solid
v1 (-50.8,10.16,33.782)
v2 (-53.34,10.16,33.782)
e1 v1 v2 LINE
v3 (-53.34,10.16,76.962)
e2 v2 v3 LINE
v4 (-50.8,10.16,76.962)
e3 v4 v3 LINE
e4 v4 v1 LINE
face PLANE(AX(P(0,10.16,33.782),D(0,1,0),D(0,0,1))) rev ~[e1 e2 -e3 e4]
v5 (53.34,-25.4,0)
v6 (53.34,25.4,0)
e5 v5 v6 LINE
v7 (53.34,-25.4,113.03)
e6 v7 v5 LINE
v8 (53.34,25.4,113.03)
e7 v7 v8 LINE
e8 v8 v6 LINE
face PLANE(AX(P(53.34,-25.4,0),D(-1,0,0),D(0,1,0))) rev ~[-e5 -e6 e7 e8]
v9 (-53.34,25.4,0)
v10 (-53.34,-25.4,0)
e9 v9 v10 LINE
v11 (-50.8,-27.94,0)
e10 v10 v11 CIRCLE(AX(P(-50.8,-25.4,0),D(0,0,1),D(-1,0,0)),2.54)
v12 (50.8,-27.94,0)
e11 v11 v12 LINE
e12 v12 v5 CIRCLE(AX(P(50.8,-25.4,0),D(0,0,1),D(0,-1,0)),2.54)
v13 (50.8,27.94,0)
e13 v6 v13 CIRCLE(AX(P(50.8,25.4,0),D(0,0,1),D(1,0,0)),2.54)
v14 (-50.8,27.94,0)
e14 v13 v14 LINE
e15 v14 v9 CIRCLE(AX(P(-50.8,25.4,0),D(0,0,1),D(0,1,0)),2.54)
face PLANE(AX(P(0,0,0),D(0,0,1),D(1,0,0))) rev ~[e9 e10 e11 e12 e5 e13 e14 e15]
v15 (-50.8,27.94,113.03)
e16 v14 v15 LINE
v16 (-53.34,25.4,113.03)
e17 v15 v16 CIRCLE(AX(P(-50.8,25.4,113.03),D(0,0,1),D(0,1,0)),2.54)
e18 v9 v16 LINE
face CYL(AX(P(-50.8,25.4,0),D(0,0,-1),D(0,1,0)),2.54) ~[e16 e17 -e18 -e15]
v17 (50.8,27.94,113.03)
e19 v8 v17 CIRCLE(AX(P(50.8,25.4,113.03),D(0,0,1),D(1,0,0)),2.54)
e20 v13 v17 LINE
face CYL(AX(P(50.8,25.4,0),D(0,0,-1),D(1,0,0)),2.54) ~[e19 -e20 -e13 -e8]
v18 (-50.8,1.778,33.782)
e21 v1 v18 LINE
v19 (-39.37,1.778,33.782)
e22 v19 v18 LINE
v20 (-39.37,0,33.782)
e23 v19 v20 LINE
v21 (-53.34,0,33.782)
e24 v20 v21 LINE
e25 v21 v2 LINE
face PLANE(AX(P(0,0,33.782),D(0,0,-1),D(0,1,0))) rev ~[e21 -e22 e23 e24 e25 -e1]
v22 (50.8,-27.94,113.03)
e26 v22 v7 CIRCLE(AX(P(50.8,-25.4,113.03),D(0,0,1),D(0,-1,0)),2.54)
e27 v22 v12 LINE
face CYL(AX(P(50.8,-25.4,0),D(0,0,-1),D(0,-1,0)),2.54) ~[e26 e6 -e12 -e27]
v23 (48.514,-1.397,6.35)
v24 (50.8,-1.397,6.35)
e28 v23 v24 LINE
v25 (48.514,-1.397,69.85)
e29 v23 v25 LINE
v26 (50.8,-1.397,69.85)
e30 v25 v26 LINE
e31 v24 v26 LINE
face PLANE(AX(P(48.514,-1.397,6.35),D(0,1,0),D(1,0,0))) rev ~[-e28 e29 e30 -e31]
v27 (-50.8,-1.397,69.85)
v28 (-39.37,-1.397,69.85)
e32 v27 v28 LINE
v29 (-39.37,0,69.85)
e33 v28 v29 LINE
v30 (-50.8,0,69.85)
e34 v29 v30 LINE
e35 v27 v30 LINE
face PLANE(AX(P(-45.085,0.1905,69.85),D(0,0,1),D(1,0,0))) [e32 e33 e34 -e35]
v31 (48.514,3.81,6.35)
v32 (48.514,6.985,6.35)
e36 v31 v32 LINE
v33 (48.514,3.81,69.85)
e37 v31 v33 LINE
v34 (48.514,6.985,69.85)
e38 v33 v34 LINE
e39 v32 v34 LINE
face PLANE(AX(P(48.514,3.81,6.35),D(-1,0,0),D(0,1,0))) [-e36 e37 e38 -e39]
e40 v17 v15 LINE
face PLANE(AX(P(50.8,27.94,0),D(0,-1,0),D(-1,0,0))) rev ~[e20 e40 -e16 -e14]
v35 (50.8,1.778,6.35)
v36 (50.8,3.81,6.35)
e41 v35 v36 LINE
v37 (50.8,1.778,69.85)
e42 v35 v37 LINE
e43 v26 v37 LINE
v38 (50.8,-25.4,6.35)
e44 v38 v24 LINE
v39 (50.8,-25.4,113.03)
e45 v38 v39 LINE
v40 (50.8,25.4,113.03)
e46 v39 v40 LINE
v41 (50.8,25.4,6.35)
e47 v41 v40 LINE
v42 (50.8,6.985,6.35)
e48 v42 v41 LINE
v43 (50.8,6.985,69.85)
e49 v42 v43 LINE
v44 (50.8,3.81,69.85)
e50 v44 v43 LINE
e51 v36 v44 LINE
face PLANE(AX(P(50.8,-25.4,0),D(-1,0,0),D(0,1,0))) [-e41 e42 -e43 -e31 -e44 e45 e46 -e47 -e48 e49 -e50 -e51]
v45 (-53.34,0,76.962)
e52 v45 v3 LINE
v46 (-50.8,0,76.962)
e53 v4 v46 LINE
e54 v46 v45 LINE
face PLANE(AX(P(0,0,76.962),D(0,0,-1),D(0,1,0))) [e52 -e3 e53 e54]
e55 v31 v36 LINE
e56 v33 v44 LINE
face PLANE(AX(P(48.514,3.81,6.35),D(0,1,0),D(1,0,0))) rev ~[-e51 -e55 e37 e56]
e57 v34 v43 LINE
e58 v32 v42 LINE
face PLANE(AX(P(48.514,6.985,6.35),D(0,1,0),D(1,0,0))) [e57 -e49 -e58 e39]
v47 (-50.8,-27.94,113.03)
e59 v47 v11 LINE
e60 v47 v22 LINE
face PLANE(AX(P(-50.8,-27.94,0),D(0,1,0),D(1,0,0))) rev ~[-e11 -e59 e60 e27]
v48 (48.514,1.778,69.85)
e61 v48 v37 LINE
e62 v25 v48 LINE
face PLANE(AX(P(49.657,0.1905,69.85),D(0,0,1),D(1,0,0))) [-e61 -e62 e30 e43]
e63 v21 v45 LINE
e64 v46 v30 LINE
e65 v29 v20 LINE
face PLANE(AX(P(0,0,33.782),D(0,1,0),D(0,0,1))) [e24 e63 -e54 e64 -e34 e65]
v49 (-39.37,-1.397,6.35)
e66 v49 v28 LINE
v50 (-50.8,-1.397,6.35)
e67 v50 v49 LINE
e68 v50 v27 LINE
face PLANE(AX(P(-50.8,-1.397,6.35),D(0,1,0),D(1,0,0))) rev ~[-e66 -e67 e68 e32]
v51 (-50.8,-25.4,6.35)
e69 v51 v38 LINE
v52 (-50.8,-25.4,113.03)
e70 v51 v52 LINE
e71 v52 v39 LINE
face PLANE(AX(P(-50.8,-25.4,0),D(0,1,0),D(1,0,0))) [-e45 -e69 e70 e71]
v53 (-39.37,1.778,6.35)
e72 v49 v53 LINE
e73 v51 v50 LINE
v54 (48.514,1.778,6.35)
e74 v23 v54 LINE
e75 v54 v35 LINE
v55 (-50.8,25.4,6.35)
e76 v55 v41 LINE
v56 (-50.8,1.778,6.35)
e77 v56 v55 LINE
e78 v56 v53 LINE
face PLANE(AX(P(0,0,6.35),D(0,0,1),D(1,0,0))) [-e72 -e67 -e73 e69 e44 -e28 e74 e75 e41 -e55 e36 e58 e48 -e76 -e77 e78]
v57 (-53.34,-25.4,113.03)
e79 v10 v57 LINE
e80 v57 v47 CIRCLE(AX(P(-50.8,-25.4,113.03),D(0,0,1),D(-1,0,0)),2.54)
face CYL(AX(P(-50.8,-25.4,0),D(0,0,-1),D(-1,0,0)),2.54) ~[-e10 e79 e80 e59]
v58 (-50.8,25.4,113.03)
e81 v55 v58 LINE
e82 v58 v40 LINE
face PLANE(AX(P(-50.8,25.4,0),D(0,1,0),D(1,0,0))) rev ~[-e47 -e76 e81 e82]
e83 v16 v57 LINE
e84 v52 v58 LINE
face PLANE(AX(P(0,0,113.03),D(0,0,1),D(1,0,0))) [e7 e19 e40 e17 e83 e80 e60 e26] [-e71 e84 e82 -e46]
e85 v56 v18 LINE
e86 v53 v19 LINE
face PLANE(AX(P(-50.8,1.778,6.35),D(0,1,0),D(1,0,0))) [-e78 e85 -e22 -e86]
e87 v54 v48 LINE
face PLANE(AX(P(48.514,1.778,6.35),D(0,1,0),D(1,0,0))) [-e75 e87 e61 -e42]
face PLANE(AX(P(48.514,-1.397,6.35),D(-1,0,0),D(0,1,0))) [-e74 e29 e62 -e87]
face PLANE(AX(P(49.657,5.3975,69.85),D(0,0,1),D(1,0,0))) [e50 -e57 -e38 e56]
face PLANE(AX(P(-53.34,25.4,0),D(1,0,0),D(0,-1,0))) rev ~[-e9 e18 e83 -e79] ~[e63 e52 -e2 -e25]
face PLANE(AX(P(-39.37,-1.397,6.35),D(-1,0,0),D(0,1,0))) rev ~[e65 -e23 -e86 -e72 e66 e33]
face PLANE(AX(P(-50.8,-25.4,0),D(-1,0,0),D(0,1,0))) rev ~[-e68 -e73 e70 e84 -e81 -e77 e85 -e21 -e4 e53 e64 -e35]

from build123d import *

# Parameters (mm, degrees)
F0_W     = 101.6
F0_H     = 50.8
F1_DEPTH = 113.03
F2_DEPTH = 6.35
F3_W     = 11.43
F3_H     = 3.175
F4_DEPTH = 63.5
F5_W     = 2.286
F5_H     = 3.175
F6_DEPTH = 63.5
F7_W     = 10.16
F7_H     = 43.18
F8_DEPTH = 73.66


# Not quite as in the source:
# - a feature names something its author has since deleted; it is built from what else it names


with BuildPart() as f1:
    # F0 (on Top) → F1 (new body)
    with BuildSketch(Plane.XY):
        with BuildLine():
            ThreePointArc((53.34, 25.4), (52.5960512242, 27.1960512242), (50.8, 27.94))
            Line((50.8, 27.94), (-50.8, 27.94))
            ThreePointArc((-50.8, 27.94), (-52.5960512242, 27.1960512242), (-53.34, 25.4))
            Line((-53.34, 25.4), (-53.34, -25.4))
            ThreePointArc((-53.34, -25.4), (-52.5960512242, -27.1960512242), (-50.8, -27.94))
            Line((-50.8, -27.94), (50.8, -27.94))
            ThreePointArc((50.8, -27.94), (52.5960512242, -27.1960512242), (53.34, -25.4))
            Line((53.34, -25.4), (53.34, 25.4))
        make_face()
        Rectangle(F0_W, F0_H, mode=Mode.SUBTRACT)
    extrude(amount=F1_DEPTH)

    # F0 (on Top) → F2 (join)
    with BuildSketch(Plane.XY):
        with BuildLine():
            ThreePointArc((53.34, 25.4), (52.5960512242, 27.1960512242), (50.8, 27.94))
            Line((50.8, 27.94), (-50.8, 27.94))
            ThreePointArc((-50.8, 27.94), (-52.5960512242, 27.1960512242), (-53.34, 25.4))
            Line((-53.34, 25.4), (-53.34, -25.4))
            ThreePointArc((-53.34, -25.4), (-52.5960512242, -27.1960512242), (-50.8, -27.94))
            Line((-50.8, -27.94), (50.8, -27.94))
            ThreePointArc((50.8, -27.94), (52.5960512242, -27.1960512242), (53.34, -25.4))
            Line((53.34, -25.4), (53.34, 25.4))
        make_face()
        Rectangle(F0_W, F0_H, mode=Mode.SUBTRACT)
        Rectangle(F0_W, F0_H)
    extrude(amount=F2_DEPTH)

    # F3 (on face) → F4 (join)
    with BuildSketch(Plane.XY.offset(6.35)):
        with Locations((-45.085, 0.1905)):
            Rectangle(F3_W, F3_H)
    extrude(amount=F4_DEPTH)

    # F5 (on face) → F6 (join)
    with BuildSketch(Plane.XY.offset(6.35)):
        with Locations((49.657, 5.3975)):
            Rectangle(F5_W, F5_H)
        with Locations((49.657, 0.1905)):
            Rectangle(F5_W, F5_H)
    extrude(amount=F6_DEPTH)

    # F7 (on Right) → F8 (cut)
    with BuildSketch(Plane.YZ):
        with Locations((5.08, 55.372)):
            Rectangle(F7_W, F7_H)
    extrude(amount=-F8_DEPTH, mode=Mode.SUBTRACT)


solid = f1.part
